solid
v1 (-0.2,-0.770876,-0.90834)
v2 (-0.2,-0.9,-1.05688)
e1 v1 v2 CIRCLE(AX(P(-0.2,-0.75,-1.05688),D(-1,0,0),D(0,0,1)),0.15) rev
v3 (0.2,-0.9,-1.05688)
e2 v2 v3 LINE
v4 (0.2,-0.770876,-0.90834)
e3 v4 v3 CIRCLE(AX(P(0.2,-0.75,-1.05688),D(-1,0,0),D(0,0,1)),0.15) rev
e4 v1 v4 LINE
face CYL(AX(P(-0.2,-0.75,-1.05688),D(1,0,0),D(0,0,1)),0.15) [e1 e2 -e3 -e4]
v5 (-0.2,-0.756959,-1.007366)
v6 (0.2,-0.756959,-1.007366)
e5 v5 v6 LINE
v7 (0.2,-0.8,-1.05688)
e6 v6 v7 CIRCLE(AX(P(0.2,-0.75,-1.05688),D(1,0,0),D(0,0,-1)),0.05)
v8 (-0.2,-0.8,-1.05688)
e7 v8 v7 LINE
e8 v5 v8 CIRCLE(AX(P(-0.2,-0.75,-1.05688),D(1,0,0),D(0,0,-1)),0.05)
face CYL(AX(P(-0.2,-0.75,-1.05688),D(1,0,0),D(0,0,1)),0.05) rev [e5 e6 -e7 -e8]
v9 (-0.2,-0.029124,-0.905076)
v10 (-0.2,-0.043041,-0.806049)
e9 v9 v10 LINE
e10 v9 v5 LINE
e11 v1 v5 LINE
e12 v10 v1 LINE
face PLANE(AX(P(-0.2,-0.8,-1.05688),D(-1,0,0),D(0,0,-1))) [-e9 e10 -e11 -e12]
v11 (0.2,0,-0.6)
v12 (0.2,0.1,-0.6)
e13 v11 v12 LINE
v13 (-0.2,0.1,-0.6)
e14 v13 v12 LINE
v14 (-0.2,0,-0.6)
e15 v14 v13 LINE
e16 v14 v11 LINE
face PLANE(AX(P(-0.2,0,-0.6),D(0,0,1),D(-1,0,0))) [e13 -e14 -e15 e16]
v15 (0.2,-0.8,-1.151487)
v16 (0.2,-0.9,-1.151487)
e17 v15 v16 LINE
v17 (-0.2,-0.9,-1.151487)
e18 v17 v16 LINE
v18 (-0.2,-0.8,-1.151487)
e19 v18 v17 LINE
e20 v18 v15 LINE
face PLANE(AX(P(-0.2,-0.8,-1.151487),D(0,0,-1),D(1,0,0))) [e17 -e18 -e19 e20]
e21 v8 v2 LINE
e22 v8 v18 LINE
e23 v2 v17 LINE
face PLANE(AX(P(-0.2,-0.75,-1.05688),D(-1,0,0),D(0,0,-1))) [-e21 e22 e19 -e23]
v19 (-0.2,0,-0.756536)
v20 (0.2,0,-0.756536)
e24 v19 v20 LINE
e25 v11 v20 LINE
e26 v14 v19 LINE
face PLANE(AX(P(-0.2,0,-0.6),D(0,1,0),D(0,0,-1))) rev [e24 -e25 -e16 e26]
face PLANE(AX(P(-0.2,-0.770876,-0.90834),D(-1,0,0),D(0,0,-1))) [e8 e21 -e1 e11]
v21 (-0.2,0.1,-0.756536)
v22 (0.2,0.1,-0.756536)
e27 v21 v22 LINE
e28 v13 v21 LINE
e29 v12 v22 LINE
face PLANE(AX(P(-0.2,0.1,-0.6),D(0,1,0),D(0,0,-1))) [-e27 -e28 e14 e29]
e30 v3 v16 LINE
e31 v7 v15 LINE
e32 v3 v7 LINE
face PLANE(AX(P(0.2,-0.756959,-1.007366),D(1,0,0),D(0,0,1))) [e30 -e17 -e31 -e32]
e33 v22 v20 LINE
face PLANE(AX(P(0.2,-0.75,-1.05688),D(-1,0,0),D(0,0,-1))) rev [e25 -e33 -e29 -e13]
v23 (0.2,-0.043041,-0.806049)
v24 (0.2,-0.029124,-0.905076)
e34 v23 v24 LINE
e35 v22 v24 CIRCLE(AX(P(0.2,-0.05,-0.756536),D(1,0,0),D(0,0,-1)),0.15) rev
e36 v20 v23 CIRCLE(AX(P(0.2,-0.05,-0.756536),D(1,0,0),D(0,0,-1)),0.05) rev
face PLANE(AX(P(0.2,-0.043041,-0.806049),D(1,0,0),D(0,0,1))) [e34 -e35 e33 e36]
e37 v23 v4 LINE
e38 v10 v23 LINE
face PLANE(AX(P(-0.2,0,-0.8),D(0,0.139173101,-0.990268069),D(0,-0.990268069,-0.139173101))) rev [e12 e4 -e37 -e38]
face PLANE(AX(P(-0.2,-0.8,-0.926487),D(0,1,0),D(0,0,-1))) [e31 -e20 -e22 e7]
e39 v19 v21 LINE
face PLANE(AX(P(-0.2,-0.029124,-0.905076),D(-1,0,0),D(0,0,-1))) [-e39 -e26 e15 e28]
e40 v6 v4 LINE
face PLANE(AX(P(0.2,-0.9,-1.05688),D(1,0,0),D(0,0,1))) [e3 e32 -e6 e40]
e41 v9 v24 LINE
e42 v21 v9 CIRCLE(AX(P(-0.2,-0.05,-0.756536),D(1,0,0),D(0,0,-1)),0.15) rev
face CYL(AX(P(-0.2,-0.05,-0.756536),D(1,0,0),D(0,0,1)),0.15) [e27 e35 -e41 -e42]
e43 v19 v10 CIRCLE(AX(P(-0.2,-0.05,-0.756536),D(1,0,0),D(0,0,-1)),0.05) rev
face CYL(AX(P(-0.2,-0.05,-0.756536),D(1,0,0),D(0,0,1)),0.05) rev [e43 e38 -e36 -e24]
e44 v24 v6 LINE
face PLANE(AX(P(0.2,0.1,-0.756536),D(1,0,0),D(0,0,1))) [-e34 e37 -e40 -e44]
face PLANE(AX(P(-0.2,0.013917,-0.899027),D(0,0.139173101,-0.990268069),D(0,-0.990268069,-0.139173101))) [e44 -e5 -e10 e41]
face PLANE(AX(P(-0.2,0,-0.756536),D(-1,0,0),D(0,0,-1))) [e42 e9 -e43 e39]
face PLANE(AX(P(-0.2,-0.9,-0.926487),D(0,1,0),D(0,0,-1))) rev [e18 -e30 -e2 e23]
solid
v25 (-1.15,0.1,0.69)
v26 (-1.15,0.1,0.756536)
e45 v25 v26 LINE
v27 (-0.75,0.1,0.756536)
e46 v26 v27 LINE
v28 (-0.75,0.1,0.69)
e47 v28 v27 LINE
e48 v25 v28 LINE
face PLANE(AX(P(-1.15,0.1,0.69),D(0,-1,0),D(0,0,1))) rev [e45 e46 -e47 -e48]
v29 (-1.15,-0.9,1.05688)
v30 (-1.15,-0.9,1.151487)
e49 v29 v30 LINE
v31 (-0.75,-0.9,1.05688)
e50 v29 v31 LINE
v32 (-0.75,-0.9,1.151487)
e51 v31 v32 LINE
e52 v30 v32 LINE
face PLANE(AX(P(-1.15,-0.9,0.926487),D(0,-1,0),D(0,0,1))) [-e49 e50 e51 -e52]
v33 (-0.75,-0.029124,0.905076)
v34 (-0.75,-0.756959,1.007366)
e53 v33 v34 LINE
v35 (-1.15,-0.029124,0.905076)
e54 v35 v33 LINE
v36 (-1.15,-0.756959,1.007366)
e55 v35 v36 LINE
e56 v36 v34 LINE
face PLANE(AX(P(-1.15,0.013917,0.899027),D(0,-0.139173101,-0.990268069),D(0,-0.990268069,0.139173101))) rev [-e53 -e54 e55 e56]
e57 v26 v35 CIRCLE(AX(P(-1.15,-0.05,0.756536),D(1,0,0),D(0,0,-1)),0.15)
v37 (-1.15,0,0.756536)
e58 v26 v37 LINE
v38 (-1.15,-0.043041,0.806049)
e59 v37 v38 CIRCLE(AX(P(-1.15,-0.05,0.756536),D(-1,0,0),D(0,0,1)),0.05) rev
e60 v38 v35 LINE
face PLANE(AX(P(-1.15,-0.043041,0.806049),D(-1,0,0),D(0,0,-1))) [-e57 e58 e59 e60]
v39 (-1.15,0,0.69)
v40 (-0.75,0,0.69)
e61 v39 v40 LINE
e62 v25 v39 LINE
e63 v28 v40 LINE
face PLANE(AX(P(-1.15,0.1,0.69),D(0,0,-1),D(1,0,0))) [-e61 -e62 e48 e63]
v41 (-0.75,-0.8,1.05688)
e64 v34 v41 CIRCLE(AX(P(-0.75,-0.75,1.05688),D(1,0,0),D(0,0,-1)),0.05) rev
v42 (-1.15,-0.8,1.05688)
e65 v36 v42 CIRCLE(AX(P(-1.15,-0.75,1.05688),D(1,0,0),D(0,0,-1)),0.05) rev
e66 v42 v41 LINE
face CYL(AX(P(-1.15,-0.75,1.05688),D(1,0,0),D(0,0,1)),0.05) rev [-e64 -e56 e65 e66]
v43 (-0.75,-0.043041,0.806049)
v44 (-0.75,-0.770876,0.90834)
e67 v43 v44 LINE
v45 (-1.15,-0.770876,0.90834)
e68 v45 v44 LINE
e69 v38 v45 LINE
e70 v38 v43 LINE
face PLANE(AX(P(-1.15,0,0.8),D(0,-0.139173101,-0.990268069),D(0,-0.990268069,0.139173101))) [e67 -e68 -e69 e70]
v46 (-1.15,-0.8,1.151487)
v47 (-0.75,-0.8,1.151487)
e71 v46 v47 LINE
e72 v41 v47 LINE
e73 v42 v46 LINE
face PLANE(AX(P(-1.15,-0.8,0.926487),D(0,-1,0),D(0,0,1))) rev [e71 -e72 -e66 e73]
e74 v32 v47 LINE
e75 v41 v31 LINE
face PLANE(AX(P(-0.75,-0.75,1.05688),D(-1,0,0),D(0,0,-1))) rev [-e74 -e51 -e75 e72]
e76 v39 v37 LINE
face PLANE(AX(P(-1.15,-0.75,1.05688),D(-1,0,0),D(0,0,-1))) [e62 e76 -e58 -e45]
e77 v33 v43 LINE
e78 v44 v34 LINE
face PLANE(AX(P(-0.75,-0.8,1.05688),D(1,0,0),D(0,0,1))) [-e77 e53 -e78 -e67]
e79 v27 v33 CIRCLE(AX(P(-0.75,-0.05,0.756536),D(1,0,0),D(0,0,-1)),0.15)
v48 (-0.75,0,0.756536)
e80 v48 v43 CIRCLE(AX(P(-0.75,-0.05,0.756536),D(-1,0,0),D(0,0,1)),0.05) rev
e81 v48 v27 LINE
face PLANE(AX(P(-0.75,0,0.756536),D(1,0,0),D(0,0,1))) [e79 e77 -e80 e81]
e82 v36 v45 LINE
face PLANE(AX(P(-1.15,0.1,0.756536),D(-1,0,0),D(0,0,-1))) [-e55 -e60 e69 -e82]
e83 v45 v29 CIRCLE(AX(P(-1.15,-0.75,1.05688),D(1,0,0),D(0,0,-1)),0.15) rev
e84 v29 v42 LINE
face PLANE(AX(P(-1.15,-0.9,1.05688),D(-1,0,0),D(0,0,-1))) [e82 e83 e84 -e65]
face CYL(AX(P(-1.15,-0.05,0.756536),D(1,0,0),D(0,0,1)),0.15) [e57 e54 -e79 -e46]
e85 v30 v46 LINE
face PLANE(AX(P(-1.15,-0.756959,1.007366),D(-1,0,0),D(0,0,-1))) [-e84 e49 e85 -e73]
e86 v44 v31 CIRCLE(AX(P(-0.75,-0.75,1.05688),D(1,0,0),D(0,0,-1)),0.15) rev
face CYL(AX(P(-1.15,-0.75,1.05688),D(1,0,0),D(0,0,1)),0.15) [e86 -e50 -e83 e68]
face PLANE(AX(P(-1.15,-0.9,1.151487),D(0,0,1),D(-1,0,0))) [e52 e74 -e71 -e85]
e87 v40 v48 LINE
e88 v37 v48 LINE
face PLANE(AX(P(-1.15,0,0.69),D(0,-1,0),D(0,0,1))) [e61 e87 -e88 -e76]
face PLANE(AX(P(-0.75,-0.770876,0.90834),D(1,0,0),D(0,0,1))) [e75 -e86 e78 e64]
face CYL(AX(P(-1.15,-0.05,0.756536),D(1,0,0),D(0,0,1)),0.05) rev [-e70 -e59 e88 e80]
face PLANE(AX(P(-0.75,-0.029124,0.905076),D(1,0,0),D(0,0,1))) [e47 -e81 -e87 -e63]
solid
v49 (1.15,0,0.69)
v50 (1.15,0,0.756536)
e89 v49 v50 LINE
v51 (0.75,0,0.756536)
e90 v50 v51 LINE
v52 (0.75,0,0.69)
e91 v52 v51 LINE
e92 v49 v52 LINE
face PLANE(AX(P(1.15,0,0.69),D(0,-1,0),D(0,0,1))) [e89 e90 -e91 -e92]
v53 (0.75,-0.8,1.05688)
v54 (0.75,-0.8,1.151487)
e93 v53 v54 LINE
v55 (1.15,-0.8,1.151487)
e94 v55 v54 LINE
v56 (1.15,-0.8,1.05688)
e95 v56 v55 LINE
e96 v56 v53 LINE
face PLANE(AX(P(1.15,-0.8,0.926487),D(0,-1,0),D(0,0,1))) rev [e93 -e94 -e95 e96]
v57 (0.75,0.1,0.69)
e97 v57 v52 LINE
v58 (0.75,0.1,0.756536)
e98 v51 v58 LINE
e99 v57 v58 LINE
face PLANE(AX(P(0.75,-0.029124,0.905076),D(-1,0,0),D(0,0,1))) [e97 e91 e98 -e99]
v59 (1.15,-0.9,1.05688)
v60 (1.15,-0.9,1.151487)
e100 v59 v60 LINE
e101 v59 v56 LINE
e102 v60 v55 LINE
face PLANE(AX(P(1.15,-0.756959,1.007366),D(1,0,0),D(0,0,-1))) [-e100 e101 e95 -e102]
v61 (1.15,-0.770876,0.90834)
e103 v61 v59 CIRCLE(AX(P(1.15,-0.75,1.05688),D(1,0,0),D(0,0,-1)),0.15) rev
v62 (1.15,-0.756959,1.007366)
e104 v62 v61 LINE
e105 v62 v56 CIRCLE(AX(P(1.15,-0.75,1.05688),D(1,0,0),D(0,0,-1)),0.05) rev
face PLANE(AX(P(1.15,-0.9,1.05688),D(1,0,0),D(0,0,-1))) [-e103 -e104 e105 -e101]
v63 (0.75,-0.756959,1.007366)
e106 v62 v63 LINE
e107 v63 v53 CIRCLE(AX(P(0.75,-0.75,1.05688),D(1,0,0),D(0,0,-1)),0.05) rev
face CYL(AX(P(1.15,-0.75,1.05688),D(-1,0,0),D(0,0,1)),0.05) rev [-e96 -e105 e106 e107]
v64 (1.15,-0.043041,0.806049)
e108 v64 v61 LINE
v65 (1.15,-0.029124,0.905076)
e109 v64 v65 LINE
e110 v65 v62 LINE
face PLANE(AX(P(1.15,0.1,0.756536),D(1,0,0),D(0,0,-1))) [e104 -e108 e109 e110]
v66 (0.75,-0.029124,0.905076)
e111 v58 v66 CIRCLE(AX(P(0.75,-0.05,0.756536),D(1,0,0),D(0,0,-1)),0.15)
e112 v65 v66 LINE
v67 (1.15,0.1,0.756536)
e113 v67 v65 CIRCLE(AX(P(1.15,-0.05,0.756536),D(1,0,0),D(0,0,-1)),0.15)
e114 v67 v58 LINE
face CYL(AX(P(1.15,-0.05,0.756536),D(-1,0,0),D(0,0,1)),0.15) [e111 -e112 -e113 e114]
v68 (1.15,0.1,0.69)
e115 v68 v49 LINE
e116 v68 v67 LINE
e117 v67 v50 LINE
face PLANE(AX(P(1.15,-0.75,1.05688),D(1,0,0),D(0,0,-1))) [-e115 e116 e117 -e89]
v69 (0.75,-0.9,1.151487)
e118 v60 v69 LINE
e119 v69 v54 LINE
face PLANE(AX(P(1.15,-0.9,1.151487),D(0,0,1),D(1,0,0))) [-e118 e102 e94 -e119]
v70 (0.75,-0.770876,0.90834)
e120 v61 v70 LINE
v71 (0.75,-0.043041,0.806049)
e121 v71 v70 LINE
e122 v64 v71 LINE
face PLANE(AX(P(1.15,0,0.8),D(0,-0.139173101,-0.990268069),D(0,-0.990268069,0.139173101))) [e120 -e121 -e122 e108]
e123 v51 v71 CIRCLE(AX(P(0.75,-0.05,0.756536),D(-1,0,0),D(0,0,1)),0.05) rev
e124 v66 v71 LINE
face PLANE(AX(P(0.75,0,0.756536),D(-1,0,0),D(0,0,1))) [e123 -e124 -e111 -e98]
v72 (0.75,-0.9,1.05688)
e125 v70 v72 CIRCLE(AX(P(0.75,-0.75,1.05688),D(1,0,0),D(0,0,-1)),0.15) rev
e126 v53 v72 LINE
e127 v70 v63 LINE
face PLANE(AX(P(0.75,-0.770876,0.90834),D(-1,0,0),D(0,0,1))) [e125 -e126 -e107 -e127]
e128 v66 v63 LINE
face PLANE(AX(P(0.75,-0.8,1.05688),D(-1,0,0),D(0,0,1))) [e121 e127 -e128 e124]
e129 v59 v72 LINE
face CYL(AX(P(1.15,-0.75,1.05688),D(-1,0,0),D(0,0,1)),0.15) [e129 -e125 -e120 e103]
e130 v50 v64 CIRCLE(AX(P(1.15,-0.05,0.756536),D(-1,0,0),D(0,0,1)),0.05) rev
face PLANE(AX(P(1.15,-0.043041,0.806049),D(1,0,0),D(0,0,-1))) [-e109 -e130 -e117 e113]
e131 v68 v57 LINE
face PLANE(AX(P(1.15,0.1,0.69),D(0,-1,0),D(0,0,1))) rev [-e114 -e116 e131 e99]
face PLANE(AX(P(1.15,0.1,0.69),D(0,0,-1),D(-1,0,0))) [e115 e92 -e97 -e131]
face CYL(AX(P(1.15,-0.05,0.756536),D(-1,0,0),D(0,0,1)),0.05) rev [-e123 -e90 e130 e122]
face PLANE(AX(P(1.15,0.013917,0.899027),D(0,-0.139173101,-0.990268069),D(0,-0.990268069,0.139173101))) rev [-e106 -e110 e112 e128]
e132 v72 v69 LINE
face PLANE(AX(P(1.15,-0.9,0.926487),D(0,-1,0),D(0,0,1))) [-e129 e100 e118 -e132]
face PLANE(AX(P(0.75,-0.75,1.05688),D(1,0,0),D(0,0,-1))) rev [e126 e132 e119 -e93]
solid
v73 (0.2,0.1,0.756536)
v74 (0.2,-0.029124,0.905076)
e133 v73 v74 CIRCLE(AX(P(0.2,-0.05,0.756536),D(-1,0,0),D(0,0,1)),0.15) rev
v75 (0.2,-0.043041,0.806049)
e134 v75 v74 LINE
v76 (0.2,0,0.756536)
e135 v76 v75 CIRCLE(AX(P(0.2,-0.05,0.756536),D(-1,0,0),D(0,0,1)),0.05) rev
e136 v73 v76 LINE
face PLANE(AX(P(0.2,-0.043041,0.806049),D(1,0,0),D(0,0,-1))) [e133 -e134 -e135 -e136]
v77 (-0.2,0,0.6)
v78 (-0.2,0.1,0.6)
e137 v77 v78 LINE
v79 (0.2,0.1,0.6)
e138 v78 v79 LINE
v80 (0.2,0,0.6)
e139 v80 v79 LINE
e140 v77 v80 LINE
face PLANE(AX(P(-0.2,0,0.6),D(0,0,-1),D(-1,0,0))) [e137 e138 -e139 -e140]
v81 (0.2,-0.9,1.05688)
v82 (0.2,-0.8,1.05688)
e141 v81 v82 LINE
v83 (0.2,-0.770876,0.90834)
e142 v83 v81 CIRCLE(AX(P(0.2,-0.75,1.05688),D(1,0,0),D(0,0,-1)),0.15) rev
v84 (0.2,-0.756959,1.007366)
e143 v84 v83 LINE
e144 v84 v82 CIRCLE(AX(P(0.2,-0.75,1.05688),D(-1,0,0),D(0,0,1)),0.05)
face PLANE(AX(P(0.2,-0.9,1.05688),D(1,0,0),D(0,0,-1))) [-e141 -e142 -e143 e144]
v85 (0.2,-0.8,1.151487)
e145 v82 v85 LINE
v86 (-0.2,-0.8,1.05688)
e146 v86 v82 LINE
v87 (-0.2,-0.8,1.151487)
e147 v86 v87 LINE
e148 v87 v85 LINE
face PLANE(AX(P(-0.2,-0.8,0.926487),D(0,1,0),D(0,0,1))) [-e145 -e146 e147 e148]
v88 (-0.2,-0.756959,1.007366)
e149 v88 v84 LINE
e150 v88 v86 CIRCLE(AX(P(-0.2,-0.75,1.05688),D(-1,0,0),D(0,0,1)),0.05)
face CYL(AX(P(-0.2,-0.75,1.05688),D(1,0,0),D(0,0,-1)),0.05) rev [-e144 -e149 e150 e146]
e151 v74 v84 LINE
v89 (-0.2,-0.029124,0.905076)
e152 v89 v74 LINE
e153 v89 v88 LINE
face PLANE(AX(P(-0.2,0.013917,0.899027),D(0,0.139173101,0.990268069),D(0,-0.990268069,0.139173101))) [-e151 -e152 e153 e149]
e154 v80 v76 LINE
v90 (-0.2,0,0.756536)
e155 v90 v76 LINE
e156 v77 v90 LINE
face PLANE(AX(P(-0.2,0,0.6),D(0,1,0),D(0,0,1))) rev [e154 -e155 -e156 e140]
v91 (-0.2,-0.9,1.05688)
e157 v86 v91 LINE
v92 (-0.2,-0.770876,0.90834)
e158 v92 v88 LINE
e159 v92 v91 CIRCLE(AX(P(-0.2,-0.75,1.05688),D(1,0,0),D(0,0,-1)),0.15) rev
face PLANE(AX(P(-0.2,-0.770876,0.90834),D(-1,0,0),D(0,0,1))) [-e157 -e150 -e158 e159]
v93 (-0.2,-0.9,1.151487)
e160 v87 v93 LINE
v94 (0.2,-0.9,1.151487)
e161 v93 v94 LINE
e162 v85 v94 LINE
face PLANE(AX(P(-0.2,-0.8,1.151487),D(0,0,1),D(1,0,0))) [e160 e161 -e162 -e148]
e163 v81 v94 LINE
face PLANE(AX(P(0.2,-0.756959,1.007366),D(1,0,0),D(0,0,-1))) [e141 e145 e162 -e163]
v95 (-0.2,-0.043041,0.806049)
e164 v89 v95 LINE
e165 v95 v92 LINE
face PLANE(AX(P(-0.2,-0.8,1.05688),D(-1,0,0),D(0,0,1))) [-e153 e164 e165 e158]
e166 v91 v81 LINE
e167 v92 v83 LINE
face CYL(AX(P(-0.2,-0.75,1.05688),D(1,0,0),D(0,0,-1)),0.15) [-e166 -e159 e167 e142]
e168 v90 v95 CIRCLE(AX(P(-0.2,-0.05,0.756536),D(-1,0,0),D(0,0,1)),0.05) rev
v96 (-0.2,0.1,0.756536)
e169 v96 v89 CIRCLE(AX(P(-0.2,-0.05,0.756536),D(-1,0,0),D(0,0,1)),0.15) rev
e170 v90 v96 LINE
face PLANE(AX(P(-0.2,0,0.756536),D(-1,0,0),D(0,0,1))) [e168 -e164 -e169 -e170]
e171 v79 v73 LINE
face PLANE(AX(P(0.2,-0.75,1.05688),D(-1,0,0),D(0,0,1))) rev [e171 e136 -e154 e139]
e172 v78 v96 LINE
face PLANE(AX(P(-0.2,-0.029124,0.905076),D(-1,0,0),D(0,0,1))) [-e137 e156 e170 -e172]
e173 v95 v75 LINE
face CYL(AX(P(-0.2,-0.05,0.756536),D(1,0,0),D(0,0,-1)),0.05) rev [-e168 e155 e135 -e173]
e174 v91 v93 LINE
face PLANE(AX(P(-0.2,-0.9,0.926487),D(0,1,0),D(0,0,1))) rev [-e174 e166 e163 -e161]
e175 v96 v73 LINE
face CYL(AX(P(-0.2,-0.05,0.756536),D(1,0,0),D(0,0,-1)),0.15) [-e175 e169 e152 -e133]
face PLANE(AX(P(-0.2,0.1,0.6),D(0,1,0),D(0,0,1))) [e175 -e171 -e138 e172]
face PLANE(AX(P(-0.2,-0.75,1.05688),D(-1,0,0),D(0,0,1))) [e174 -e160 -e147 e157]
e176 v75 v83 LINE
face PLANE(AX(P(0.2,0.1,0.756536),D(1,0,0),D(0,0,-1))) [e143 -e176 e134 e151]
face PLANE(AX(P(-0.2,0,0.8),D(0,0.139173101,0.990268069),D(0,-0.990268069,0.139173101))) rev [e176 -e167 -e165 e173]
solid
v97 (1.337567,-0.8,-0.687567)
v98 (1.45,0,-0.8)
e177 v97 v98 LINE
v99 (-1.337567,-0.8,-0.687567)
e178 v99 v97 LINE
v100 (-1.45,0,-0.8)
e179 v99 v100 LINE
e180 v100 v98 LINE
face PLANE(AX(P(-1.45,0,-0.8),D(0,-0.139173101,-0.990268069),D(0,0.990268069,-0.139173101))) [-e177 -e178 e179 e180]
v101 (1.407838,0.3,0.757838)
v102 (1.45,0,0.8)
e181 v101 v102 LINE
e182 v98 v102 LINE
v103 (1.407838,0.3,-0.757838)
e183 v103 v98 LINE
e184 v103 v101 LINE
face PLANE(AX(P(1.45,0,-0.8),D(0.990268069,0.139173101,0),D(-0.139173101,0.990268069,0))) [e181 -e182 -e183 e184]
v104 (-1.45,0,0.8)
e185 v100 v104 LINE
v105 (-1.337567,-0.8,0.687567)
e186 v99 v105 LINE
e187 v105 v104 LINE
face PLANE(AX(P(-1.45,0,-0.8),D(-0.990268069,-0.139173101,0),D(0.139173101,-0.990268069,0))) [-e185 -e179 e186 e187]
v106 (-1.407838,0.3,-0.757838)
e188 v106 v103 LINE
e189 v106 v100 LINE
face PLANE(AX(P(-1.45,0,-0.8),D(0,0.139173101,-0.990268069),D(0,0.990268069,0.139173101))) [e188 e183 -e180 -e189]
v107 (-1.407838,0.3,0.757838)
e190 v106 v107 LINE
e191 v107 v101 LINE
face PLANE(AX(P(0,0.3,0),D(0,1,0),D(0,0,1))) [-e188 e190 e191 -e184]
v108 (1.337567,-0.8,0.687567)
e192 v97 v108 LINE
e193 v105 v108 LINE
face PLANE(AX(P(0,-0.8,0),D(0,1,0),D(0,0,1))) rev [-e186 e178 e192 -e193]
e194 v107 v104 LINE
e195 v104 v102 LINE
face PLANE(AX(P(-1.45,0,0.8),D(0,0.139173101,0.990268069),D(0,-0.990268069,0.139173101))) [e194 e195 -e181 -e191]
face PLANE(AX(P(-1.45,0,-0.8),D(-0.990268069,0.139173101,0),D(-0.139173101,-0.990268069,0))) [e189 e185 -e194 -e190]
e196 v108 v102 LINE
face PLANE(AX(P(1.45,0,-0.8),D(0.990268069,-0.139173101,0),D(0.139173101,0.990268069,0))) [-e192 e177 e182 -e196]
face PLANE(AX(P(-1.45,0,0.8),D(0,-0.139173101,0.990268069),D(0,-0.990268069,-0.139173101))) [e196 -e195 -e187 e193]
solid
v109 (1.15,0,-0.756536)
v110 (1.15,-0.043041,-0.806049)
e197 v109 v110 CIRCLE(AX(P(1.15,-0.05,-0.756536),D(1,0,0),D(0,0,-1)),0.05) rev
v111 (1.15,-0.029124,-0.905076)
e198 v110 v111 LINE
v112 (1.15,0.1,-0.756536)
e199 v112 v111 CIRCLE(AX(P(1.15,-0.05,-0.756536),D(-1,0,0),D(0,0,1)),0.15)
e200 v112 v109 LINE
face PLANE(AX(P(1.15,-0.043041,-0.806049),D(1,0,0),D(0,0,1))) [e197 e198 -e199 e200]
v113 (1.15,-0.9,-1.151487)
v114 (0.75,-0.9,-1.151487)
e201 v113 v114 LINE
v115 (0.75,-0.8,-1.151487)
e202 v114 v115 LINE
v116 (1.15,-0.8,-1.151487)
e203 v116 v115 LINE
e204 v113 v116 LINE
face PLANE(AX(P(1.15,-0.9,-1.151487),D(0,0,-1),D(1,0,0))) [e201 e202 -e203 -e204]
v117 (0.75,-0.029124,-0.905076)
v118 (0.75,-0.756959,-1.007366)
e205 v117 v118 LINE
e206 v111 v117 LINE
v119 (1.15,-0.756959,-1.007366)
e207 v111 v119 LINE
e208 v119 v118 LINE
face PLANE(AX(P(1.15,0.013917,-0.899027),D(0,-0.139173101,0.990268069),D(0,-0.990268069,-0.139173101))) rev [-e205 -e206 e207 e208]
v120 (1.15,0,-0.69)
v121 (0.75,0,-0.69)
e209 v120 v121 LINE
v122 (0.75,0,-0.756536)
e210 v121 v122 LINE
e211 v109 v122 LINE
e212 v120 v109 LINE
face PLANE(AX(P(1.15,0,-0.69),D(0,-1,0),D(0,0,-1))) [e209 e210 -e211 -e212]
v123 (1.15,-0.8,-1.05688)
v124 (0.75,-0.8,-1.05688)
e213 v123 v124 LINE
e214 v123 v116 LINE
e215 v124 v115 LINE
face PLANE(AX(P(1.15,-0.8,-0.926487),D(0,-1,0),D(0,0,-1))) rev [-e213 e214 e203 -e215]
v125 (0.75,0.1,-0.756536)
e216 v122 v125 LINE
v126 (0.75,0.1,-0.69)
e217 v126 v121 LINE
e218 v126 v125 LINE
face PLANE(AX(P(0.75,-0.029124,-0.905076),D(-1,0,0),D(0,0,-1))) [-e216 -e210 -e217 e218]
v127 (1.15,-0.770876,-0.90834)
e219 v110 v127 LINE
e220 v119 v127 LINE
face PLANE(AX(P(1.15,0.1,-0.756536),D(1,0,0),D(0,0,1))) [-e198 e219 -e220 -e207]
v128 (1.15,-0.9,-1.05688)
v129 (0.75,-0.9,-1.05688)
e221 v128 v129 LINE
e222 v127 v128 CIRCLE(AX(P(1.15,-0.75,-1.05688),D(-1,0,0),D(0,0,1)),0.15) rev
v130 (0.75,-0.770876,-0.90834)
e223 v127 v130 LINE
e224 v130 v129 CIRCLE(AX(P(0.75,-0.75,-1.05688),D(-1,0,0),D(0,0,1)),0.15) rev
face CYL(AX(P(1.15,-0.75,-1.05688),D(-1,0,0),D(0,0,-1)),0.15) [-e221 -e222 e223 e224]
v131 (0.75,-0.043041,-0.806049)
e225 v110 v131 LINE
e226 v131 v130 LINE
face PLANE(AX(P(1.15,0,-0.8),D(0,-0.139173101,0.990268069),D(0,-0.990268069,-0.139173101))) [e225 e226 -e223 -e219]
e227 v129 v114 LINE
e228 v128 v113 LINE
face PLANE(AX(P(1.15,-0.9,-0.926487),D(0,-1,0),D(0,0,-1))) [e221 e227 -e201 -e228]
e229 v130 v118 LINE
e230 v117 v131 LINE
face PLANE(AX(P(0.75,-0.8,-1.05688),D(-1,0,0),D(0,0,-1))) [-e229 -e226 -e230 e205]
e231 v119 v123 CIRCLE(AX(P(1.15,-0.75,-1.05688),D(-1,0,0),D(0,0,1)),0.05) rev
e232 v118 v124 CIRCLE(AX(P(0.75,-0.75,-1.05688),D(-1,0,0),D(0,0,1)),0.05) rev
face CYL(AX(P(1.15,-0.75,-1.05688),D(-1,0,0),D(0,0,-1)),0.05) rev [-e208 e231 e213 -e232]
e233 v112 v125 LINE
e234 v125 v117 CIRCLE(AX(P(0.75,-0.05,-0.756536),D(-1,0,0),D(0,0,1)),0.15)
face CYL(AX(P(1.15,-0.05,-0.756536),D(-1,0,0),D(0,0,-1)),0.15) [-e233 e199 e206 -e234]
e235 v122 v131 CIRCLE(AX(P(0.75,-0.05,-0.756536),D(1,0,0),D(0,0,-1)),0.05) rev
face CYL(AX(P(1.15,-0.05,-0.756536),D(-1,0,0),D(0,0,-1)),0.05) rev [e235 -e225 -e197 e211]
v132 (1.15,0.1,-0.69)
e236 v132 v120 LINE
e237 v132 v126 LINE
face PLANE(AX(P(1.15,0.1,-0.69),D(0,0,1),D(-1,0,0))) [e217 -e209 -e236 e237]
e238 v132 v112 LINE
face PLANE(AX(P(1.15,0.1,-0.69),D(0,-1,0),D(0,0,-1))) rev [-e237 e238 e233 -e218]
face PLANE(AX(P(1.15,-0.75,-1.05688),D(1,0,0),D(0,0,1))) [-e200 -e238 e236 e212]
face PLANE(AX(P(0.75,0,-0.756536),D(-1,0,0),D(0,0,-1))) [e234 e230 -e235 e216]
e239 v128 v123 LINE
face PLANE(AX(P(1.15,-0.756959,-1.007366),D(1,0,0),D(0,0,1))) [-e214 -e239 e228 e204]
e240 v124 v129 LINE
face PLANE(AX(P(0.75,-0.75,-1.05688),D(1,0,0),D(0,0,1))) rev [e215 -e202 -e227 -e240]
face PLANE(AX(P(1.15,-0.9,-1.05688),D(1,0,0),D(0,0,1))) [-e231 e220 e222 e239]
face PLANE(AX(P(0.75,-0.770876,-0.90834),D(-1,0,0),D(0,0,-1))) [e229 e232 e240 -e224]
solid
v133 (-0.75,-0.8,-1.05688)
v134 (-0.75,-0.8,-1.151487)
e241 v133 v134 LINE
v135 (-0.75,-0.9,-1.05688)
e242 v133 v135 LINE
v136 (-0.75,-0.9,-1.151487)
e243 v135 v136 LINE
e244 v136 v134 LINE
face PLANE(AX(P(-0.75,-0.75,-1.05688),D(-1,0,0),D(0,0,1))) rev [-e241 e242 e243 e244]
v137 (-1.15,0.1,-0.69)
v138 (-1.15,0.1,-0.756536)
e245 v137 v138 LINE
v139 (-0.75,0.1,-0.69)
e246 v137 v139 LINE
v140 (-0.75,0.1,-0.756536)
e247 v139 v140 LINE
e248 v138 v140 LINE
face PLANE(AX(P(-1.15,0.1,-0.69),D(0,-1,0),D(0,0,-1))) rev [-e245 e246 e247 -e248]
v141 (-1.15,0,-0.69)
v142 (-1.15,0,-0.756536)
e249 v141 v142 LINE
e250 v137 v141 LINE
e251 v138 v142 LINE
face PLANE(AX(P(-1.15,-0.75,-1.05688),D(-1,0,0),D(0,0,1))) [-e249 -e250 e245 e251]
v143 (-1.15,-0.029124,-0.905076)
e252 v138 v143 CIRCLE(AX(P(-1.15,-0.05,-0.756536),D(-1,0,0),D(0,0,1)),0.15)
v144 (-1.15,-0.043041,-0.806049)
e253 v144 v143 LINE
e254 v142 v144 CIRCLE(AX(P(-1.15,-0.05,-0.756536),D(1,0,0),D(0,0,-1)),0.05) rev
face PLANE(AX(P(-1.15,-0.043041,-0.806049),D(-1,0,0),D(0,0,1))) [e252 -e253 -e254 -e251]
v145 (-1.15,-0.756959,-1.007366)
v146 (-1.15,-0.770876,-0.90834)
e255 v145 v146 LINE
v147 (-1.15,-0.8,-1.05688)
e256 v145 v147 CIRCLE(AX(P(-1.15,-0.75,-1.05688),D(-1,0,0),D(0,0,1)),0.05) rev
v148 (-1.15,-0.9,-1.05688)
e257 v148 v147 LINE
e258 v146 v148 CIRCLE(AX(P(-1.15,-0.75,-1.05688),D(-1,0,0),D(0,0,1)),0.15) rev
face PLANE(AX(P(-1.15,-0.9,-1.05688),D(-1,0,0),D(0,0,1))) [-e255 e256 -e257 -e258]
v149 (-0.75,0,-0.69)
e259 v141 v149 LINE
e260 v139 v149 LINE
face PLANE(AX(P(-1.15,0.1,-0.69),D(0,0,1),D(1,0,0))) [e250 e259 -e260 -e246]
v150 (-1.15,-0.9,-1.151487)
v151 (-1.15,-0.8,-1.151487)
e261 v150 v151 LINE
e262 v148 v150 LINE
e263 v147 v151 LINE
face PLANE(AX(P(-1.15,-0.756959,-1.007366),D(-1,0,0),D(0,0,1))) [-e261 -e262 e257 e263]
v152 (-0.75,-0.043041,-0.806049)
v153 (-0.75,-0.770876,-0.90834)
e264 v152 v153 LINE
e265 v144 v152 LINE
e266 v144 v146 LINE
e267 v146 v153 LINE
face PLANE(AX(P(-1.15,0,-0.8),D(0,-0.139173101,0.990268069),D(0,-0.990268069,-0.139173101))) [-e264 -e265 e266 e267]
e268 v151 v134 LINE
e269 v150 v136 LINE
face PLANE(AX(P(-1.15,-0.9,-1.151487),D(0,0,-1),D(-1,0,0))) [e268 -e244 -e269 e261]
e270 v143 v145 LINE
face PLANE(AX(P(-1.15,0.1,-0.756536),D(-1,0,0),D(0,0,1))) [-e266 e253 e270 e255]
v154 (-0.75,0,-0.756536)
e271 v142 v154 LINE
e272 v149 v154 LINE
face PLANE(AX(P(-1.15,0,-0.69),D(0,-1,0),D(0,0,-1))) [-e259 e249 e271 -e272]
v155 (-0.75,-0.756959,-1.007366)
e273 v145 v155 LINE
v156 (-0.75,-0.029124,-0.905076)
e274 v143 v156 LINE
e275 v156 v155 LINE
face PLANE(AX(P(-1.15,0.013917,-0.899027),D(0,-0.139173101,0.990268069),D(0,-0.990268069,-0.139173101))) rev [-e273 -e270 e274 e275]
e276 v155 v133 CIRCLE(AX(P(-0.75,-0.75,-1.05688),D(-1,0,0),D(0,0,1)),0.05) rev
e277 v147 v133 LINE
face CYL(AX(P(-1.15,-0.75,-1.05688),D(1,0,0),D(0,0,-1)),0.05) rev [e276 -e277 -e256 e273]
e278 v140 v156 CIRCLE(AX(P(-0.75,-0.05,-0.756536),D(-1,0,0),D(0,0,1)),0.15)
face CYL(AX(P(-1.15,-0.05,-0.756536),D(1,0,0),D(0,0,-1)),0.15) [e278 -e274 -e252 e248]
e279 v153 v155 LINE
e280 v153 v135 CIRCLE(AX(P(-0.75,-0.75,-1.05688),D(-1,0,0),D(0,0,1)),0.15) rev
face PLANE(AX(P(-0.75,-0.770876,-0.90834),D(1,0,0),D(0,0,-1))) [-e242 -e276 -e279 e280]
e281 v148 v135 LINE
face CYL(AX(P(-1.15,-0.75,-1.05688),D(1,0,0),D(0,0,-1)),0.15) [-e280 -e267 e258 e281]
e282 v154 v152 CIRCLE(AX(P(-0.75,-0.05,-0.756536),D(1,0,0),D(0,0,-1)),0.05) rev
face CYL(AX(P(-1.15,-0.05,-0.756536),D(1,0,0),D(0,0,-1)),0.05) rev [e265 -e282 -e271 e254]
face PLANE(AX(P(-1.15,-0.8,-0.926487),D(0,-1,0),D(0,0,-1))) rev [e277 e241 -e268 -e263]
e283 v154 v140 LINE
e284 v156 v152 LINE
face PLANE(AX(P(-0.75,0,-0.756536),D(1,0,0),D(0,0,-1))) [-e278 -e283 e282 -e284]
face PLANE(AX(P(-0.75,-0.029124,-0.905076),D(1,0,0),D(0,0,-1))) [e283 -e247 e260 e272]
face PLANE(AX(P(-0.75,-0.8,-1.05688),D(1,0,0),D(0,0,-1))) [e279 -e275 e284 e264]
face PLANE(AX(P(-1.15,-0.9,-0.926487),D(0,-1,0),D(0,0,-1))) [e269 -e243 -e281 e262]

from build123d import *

# Parameters (mm, degrees)
SKETCH1_W                     = 2.9
SKETCH1_H                     = 1.6
BOSS_EXTRUDE1_DEPTH           = 0.3
BOSS_EXTRUDE1_TAPER           = 8
BOSS_EXTRUDE1_OTHER_WAY_DEPTH = 0.8
BOSS_EXTRUDE1_OTHER_WAY_TAPER = 8
BASE_FLANGE2_DEPTH            = 0.2
BASE_FLANGE3_DEPTH            = 0.2


# Sheet-metal steps are written as plain solids
with BuildPart() as part:
    # Sketch1 → Boss-Extrude1 (new body)
    with BuildSketch(Plane(origin=(0, 0, 0), x_dir=(1, 0, 0), z_dir=(0, 1, 0))):
        Rectangle(SKETCH1_W, SKETCH1_H)
    extrude(amount=BOSS_EXTRUDE1_DEPTH, taper=BOSS_EXTRUDE1_TAPER)

    # Sketch1 → Boss-Extrude1 other way (add)
    with BuildSketch(Plane(origin=(0, 0, 0), x_dir=(1, 0, 0), z_dir=(0, 1, 0))):
        Rectangle(SKETCH1_W, SKETCH1_H)
    extrude(amount=-BOSS_EXTRUDE1_OTHER_WAY_DEPTH, taper=BOSS_EXTRUDE1_OTHER_WAY_TAPER)


with BuildPart() as body_2:
    # Sketch2 → Base-Flange2 (new, symmetric)
    with BuildSketch(Plane.ZY):
        with BuildLine():
            Line((0.6, 0), (0.756535663, 0))
            ThreePointArc((0.756535663, 0), (0.789338615, -0.012264521), (0.806049067, -0.043041345))
            Line((0.806049067, -0.043041345), (0.908339552, -0.770875965))
            ThreePointArc((0.908339552, -0.770875965), (0.958470908, -0.863206437), (1.056879762, -0.9))
            Line((1.056879762, -0.9), (1.151486751, -0.9))
            Line((1.151486751, -0.9), (1.151486751, -0.8))
            Line((1.151486751, -0.8), (1.056879762, -0.8))
            ThreePointArc((1.056879762, -0.8), (1.02407681, -0.787735479), (1.007366358, -0.756958655))
            Line((1.007366358, -0.756958655), (0.905075873, -0.029124035))
            ThreePointArc((0.905075873, -0.029124035), (0.854944517, 0.063206437), (0.756535663, 0.1))
            Line((0.756535663, 0.1), (0.6, 0.1))
            Line((0.6, 0.1), (0.6, 0))
        make_face()
    extrude(amount=BASE_FLANGE2_DEPTH, both=True)


with BuildPart() as body_3:
    # Sketch11 → Base-Flange3 (new, symmetric)
    with BuildSketch(Plane.ZY.offset(0.95)):
        with BuildLine():
            Line((-0.69, 0), (-0.756535663, 0))
            ThreePointArc((-0.756535663, 0), (-0.789338615, -0.012264521), (-0.806049067, -0.043041345))
            Line((-0.806049067, -0.043041345), (-0.908339552, -0.770875965))
            ThreePointArc((-0.908339552, -0.770875965), (-0.958470908, -0.863206437), (-1.056879762, -0.9))
            Line((-1.056879762, -0.9), (-1.151486751, -0.9))
            Line((-1.151486751, -0.9), (-1.151486751, -0.8))
            Line((-1.151486751, -0.8), (-1.056879762, -0.8))
            ThreePointArc((-1.056879762, -0.8), (-1.02407681, -0.787735479), (-1.007366358, -0.756958655))
            Line((-1.007366358, -0.756958655), (-0.905075873, -0.029124035))
            ThreePointArc((-0.905075873, -0.029124035), (-0.854944517, 0.063206437), (-0.756535663, 0.1))
            Line((-0.756535663, 0.1), (-0.69, 0.1))
            Line((-0.69, 0.1), (-0.69, 0))
        make_face()
    extrude(amount=BASE_FLANGE3_DEPTH, both=True)


with BuildPart() as body_4:
    # Mirror1: mirrored copy
    add(body_3.part.mirror(Plane.ZY))


with BuildPart() as body_5:
    # Mirror2: mirrored copy
    add(body_4.part.mirror(Plane.XY))


with BuildPart() as body_6:
    # Mirror2 2: mirrored copy
    add(body_3.part.mirror(Plane.XY))


with BuildPart() as body_7:
    # Mirror2 3: mirrored copy
    add(body_2.part.mirror(Plane.XY))


solid = Compound([part.part, body_2.part, body_3.part, body_4.part, body_5.part, body_6.part, body_7.part])
